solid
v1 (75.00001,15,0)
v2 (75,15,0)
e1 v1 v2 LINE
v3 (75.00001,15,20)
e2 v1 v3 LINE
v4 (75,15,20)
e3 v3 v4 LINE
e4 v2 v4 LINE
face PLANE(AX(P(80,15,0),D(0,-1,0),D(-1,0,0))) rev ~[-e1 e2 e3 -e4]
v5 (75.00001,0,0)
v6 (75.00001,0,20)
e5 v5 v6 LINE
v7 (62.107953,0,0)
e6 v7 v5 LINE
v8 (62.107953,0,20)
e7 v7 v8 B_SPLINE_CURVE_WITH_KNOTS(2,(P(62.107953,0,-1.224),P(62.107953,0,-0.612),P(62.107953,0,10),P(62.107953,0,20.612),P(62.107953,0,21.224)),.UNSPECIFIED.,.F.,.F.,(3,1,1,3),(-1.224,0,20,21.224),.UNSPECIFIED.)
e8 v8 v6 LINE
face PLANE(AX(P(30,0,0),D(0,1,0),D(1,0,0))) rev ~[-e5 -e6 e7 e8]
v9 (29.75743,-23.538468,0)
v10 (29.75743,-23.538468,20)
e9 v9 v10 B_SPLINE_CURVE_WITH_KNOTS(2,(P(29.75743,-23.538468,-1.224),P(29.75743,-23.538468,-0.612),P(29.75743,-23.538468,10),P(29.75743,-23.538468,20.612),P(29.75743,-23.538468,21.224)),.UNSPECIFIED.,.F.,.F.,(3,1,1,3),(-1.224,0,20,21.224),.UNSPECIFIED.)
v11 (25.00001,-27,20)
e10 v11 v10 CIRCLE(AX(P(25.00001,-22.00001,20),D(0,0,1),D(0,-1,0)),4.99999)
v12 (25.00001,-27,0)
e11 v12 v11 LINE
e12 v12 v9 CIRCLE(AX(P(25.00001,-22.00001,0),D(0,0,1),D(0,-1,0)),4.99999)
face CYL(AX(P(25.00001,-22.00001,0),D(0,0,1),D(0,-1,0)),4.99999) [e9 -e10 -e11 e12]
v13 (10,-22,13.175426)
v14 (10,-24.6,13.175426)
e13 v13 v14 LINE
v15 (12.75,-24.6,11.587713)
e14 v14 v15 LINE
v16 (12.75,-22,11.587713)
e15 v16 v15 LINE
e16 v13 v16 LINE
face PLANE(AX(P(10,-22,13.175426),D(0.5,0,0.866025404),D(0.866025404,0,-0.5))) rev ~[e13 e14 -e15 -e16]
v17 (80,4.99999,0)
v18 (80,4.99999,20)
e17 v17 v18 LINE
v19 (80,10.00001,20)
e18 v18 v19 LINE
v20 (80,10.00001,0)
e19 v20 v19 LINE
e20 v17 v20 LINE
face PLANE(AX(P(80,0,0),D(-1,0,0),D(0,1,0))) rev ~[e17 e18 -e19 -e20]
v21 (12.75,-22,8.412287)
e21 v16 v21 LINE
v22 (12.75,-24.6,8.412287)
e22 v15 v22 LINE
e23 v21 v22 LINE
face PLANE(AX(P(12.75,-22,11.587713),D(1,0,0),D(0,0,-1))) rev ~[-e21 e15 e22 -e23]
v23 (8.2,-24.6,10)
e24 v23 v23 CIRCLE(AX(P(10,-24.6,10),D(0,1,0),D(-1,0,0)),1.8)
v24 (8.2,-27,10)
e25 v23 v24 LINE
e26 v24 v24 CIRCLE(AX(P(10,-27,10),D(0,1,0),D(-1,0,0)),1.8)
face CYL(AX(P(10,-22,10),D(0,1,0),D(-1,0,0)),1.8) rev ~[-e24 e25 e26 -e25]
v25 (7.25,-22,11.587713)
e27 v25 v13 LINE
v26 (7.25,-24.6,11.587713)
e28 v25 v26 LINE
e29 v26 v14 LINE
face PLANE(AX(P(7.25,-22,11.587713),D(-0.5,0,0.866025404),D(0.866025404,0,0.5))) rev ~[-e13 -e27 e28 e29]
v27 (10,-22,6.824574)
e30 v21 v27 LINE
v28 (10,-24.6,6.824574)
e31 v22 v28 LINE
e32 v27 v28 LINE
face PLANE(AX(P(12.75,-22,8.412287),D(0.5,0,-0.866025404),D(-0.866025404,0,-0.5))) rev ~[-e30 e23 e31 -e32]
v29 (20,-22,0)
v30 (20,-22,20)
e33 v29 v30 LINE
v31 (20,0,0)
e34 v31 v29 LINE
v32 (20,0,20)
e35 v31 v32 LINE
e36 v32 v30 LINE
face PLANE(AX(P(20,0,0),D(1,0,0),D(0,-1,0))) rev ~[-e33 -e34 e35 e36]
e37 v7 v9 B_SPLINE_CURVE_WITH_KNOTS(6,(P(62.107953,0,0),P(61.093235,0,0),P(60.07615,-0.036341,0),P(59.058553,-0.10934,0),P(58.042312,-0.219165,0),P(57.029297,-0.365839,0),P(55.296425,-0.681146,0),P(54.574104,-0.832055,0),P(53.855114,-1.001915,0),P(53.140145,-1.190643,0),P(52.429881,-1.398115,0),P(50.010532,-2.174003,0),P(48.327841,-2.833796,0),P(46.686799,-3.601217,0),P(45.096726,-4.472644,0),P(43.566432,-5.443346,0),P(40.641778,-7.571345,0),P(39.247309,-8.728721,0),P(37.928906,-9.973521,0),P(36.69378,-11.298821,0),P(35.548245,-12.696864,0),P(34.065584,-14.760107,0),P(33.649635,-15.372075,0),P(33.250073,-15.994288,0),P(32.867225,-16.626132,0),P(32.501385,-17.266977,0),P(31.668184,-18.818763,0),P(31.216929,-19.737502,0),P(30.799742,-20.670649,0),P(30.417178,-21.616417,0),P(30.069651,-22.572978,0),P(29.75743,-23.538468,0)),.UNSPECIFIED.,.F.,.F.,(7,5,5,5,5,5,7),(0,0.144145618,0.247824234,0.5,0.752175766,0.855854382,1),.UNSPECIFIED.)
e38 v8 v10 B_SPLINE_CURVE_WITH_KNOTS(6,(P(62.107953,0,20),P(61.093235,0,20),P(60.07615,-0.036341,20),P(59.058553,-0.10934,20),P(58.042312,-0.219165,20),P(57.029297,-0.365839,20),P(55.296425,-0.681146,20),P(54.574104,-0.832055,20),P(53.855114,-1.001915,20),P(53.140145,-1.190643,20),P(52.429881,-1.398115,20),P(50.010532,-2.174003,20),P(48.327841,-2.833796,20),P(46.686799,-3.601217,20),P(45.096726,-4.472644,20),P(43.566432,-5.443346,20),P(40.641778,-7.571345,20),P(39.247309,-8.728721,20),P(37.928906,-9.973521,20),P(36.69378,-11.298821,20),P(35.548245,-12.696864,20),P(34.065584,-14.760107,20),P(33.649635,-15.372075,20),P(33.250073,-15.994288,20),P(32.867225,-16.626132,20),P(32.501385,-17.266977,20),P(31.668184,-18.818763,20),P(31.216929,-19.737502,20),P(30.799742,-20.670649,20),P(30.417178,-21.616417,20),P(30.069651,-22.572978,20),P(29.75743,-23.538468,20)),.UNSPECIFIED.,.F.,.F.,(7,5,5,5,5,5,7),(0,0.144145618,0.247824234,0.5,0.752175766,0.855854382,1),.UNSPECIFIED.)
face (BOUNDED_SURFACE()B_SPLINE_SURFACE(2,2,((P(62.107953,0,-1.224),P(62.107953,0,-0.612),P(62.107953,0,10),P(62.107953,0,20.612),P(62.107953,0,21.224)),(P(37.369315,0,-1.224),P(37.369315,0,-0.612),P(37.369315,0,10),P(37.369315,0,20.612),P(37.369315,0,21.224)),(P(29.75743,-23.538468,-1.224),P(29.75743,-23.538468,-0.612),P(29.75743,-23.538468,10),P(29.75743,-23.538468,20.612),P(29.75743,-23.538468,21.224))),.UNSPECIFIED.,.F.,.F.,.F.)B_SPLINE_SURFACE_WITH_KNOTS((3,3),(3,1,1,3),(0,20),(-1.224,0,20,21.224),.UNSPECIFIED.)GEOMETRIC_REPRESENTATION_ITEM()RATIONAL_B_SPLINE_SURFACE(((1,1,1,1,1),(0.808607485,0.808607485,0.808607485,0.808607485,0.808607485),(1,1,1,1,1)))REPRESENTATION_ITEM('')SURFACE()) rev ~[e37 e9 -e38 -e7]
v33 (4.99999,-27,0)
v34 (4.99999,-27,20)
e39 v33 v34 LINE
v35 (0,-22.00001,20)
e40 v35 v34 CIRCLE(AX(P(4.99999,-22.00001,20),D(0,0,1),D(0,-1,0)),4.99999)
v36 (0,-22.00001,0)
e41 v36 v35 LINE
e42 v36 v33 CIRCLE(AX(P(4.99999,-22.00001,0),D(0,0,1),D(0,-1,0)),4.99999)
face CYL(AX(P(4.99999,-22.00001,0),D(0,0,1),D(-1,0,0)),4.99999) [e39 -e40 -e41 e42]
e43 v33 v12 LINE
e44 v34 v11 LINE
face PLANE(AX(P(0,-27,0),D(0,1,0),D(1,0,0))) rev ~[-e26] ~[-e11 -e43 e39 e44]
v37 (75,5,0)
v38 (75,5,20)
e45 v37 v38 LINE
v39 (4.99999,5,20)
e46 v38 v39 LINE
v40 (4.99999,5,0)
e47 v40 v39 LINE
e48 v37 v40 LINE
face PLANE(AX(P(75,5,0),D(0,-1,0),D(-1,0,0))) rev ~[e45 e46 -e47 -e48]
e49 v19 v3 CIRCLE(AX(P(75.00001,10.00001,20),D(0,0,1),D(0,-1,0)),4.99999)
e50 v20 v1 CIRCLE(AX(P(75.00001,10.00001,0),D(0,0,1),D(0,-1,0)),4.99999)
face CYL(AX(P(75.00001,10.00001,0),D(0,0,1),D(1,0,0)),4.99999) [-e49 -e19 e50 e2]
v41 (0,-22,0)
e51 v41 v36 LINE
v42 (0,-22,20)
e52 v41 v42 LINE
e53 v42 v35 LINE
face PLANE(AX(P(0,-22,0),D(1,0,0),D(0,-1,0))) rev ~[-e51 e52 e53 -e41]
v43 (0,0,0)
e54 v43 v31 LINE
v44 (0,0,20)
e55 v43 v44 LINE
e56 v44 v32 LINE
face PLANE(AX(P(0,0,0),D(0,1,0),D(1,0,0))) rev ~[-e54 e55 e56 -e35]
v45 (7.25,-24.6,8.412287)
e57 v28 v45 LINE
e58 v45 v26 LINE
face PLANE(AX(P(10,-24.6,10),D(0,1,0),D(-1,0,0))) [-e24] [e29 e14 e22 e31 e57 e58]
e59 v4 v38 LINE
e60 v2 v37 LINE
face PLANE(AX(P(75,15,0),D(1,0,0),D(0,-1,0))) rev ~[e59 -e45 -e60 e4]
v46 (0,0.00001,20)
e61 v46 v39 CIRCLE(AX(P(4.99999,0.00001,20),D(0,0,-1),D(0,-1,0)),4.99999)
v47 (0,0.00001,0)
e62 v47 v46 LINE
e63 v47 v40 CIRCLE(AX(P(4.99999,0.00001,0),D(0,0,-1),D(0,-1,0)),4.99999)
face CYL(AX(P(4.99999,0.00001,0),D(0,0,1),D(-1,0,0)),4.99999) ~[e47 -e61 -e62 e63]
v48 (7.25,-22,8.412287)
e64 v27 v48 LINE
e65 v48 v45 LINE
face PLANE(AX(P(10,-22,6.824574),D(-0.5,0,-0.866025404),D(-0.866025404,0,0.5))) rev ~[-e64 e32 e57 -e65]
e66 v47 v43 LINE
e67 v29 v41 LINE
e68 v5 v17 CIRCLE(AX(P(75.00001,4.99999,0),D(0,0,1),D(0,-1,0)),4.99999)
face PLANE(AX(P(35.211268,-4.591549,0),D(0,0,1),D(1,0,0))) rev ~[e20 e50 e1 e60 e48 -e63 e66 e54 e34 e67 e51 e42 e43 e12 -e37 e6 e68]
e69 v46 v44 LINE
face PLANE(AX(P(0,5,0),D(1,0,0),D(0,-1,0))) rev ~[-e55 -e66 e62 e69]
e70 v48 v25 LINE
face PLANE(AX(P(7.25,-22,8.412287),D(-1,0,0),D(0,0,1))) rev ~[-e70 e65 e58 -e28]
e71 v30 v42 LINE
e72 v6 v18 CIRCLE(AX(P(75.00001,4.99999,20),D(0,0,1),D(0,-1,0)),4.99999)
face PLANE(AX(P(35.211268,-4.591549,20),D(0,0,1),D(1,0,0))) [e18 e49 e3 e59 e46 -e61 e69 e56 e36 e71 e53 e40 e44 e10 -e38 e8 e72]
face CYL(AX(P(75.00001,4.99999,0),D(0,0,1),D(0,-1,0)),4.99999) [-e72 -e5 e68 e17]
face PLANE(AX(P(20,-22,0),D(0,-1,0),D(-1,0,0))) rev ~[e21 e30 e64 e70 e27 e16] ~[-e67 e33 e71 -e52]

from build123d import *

# Parameters (mm, degrees)
F3_DEPTH = 20
F4_R     = 4.99999
F6_DEPTH = 2.6
F7_D     = 3.6
F7_DEPTH = 10
F7_TIP   = 1.0815491142
F8_R     = 34


# Not quite as in the source:
# - a fillet or chamfer is up to 0.001 mm smaller than in the source, because OpenCascade refuses the exact size


with BuildPart() as f3:
    # F2 (on Top) → F3 (new body)
    with BuildSketch(Plane.XY):
        Polygon((0, 5), (0, 0), (20, 0), (20, -22), (0, -22), (0, -27), (30, -27), (30, 0), (80, 0), (80, 15), (75, 15), (75, 5), align=None)
    extrude(amount=F3_DEPTH)

    # F4 (radius 5 in the source; OpenCascade refuses exactly that, so slightly less here)
    f4_edges = [f3.edges().sort_by_distance(p)[0] for p in [
        (30, -27, 10),
        (80, 0, 10),
        (80, 15, 10),
        (0, 5, 10),
        (0, -27, 10),
    ]]
    fillet(f4_edges, radius=F4_R)

    # F5 (on face) → F6 (cut)
    with BuildSketch(Plane(origin=(0, -22, 0), x_dir=(-1, 0, 0), z_dir=(0, 1, 0))):
        Polygon((-7.25, 8.4122867597), (-7.25, 11.5877132403), (-10, 13.1754264805), (-12.75, 11.5877132403), (-12.75, 8.4122867597), (-10, 6.8245735195), align=None)
    extrude(amount=-F6_DEPTH, mode=Mode.SUBTRACT)

    # F7 (one way)
    with BuildSketch(Plane(origin=(0, -22, 0), x_dir=(-1, 0, 0), z_dir=(0, 1, 0))):
        with Locations((-10, 10)):
            Circle(F7_D / 2)
    extrude(amount=-F7_DEPTH, mode=Mode.SUBTRACT)
    with Locations(Plane(origin=(0, -22, 0), x_dir=(-1, 0, 0), z_dir=(0, 1, 0))):
        with Locations((-10, 10)):
            with Locations((0, 0, -(F7_DEPTH + F7_TIP / 2))):  # 118° drill point
                Cone(0, F7_D / 2, F7_TIP, mode=Mode.SUBTRACT)

    # F8
    f8_edges = [f3.edges().sort_by_distance(p)[0] for p in [
        (30, 0, 10),
    ]]
    fillet(f8_edges, radius=F8_R)


solid = f3.part
